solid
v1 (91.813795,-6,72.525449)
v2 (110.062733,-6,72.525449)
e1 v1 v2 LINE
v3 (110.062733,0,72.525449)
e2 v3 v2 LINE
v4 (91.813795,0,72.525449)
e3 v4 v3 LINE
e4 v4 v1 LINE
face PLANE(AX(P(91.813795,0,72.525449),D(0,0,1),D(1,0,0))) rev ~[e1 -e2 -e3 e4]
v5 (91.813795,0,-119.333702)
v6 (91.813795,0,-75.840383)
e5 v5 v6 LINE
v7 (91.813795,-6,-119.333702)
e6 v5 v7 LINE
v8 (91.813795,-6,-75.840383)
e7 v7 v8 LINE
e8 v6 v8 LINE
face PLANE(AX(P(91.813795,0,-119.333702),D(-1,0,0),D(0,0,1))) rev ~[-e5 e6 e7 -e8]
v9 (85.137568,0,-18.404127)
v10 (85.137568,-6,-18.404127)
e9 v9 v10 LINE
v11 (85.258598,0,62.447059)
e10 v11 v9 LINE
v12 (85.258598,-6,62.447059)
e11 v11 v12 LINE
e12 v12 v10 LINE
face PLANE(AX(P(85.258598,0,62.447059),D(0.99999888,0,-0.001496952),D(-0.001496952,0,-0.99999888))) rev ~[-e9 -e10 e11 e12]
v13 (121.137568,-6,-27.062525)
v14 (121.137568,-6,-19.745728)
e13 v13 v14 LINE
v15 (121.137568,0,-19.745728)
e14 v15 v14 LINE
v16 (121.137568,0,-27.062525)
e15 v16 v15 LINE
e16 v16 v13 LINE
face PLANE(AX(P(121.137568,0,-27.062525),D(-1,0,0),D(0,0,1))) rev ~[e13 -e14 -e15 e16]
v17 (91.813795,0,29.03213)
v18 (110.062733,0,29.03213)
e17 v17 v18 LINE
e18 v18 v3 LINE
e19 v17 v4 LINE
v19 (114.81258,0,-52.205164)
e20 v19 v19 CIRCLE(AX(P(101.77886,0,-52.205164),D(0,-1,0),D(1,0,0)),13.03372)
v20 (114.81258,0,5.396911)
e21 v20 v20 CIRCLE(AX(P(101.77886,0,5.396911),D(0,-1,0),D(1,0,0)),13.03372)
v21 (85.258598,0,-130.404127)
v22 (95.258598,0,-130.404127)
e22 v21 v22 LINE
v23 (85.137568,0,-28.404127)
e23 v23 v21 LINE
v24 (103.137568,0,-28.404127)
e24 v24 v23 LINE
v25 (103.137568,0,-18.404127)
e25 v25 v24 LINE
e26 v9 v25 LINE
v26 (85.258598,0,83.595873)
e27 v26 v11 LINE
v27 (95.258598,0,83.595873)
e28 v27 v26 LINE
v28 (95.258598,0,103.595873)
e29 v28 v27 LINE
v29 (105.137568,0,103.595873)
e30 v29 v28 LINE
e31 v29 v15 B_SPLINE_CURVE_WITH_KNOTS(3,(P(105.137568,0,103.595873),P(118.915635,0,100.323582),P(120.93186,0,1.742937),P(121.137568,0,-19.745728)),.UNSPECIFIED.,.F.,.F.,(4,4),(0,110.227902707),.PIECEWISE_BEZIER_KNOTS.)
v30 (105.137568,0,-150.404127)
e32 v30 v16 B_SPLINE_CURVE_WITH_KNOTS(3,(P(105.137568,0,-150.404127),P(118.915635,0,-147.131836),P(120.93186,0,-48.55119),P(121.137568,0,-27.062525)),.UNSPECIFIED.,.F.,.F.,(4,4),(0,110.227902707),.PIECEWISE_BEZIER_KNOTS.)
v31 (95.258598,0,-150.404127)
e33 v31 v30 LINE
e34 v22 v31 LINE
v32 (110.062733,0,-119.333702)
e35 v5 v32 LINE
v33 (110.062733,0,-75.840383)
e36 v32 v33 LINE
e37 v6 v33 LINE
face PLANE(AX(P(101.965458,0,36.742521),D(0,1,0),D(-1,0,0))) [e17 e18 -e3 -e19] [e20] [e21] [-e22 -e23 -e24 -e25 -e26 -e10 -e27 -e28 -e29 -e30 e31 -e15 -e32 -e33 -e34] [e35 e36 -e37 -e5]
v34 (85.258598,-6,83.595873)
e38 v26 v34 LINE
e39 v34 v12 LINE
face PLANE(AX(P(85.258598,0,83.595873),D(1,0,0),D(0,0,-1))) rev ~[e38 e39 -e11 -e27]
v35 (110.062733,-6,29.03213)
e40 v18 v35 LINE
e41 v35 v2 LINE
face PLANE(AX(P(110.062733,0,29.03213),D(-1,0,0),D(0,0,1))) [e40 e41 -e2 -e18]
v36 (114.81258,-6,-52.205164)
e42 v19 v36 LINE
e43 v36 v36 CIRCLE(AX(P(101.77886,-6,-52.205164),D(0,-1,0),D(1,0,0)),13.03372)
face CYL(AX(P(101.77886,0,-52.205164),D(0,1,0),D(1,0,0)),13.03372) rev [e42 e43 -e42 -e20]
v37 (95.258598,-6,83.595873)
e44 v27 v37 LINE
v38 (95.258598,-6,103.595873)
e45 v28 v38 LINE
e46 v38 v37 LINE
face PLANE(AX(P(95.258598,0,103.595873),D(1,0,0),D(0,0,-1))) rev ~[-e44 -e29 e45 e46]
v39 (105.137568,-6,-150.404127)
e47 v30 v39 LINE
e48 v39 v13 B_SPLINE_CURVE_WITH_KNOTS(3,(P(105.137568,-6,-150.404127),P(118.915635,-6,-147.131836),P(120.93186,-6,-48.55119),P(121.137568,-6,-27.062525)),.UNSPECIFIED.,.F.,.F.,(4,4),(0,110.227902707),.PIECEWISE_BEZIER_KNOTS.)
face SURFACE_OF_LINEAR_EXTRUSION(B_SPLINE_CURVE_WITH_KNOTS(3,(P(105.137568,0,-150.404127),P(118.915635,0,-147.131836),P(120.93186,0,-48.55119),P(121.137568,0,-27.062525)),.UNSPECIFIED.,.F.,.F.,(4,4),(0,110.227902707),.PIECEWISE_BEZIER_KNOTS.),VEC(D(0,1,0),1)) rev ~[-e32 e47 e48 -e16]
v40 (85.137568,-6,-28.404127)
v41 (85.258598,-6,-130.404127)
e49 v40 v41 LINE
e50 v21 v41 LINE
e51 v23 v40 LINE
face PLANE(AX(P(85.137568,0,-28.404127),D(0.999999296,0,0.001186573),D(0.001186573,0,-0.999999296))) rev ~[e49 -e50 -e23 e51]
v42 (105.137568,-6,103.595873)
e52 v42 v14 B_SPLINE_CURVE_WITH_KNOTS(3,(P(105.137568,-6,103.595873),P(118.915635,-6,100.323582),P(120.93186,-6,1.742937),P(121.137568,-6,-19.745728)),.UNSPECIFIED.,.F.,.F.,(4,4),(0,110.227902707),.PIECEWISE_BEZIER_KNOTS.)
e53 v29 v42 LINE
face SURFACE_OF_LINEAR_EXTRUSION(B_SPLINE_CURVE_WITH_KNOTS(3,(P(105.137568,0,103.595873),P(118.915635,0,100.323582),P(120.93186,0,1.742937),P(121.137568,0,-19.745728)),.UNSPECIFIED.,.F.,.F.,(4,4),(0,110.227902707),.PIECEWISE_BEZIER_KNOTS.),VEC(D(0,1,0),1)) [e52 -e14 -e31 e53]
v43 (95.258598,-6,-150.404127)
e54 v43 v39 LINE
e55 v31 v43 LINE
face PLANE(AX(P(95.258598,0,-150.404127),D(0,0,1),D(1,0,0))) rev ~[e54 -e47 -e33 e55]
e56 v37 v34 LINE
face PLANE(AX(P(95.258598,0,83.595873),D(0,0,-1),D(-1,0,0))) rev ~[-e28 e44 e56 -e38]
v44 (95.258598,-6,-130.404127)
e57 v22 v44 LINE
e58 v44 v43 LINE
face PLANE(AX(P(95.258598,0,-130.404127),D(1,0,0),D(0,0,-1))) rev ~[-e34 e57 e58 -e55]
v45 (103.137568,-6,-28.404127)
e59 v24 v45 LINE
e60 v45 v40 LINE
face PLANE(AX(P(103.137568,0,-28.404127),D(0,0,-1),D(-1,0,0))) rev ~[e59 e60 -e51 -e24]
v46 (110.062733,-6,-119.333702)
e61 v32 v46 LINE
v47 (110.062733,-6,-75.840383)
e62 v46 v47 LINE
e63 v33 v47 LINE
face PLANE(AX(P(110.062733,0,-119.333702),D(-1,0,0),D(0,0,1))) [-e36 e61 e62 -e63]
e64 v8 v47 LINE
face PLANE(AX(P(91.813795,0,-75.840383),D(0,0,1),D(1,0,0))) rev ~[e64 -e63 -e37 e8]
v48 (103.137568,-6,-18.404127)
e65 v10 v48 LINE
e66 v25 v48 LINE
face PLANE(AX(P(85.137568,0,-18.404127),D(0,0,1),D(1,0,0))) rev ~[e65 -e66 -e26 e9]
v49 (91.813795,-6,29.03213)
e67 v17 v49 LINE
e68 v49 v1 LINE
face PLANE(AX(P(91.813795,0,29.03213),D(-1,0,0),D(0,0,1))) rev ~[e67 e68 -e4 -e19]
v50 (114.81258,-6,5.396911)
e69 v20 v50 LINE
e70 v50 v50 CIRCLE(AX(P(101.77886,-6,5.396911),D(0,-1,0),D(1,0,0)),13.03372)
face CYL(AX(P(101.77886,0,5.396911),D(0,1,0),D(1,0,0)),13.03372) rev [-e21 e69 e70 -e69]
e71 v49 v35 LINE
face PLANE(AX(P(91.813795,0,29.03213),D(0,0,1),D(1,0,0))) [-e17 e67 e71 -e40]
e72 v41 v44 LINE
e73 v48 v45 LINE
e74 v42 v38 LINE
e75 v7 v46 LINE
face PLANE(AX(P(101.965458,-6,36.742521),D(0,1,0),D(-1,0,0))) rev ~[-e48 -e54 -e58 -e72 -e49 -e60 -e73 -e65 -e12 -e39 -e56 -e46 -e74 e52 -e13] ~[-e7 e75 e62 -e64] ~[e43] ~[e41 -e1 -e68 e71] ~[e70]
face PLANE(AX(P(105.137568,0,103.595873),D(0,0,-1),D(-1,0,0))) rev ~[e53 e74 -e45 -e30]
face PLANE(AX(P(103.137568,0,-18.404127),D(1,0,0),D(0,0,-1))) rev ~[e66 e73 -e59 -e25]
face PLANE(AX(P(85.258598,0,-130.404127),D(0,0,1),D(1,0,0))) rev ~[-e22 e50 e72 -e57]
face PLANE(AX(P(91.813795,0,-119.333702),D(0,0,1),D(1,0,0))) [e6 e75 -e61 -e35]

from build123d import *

# Parameters (mm, degrees)
F0_R     = 13.033720186
F0_W     = 18.248938024
F0_H     = 43.4933193028
F1_DEPTH = 6


# Not quite as in the source:
# - a feature names something its author has since deleted; it is built from what else it names


with BuildPart() as f1:
    # F0 (on Front) → F1 (new body)
    with BuildSketch(Plane.XZ):
        with BuildLine():
            add(Edge.make_bspline(
                [(105.1375677345, 103.5958733921), (118.915635106, 100.3235823913), (120.9318600426, 1.7429371205), (121.1375677345, -19.7457277863)],
                knots=[0, 0, 0, 0, 110.2279027072, 110.2279027072, 110.2279027072, 110.2279027072], degree=3))
            Line((105.1375677345, 103.5958733921), (95.2585982296, 103.5958733921))
            Line((95.2585982296, 103.5958733921), (95.2585982296, 83.5958733921))
            Line((95.2585982296, 83.5958733921), (85.2585982296, 83.5958733921))
            Line((85.2585982296, 83.5958733921), (85.2585982296, 62.4470586631))
            Line((85.2585982296, 62.4470586631), (85.1375677345, -18.4041266079))
            Line((85.1375677345, -18.4041266079), (103.1375677345, -18.4041266079))
            Line((103.1375677345, -18.4041266079), (103.1375677345, -23.4041266079))
            Line((103.1375677345, -23.4041266079), (121.1375677345, -23.4041266079))
            Line((121.1375677345, -23.4041266079), (121.1375677345, -19.7457277863))
        make_face()
        with Locations((101.7788599941, 5.3969110339)):
            Circle(F0_R, mode=Mode.SUBTRACT)
        with Locations((100.9382642806, 50.7787894458)):
            Rectangle(F0_W, F0_H, mode=Mode.SUBTRACT)
        with BuildLine():
            Line((121.1375677345, -27.0625254295), (121.1375677345, -23.4041266079))
            Line((121.1375677345, -23.4041266079), (103.1375677345, -23.4041266079))
            Line((103.1375677345, -23.4041266079), (103.1375677345, -28.4041266079))
            Line((103.1375677345, -28.4041266079), (85.1375677345, -28.4041266079))
            Line((85.1375677345, -28.4041266079), (85.2585982296, -130.4041266079))
            Line((85.2585982296, -130.4041266079), (95.2585982296, -130.4041266079))
            Line((95.2585982296, -130.4041266079), (95.2585982296, -150.4041266079))
            Line((95.2585982296, -150.4041266079), (105.1375677345, -150.4041266079))
            add(Edge.make_bspline(
                [(105.1375677345, -150.4041266079), (118.915635106, -147.1318356072), (120.9318600426, -48.5511903363), (121.1375677345, -27.0625254295)],
                knots=[0, 0, 0, 0, 110.2279027072, 110.2279027072, 110.2279027072, 110.2279027072], degree=3))
        make_face()
        with Locations((100.9382642806, -97.5870426616)):
            Rectangle(F0_W, F0_H, mode=Mode.SUBTRACT)
        with Locations((101.7788599941, -52.2051642497)):
            Circle(F0_R, mode=Mode.SUBTRACT)
    extrude(amount=F1_DEPTH)


solid = f1.part
